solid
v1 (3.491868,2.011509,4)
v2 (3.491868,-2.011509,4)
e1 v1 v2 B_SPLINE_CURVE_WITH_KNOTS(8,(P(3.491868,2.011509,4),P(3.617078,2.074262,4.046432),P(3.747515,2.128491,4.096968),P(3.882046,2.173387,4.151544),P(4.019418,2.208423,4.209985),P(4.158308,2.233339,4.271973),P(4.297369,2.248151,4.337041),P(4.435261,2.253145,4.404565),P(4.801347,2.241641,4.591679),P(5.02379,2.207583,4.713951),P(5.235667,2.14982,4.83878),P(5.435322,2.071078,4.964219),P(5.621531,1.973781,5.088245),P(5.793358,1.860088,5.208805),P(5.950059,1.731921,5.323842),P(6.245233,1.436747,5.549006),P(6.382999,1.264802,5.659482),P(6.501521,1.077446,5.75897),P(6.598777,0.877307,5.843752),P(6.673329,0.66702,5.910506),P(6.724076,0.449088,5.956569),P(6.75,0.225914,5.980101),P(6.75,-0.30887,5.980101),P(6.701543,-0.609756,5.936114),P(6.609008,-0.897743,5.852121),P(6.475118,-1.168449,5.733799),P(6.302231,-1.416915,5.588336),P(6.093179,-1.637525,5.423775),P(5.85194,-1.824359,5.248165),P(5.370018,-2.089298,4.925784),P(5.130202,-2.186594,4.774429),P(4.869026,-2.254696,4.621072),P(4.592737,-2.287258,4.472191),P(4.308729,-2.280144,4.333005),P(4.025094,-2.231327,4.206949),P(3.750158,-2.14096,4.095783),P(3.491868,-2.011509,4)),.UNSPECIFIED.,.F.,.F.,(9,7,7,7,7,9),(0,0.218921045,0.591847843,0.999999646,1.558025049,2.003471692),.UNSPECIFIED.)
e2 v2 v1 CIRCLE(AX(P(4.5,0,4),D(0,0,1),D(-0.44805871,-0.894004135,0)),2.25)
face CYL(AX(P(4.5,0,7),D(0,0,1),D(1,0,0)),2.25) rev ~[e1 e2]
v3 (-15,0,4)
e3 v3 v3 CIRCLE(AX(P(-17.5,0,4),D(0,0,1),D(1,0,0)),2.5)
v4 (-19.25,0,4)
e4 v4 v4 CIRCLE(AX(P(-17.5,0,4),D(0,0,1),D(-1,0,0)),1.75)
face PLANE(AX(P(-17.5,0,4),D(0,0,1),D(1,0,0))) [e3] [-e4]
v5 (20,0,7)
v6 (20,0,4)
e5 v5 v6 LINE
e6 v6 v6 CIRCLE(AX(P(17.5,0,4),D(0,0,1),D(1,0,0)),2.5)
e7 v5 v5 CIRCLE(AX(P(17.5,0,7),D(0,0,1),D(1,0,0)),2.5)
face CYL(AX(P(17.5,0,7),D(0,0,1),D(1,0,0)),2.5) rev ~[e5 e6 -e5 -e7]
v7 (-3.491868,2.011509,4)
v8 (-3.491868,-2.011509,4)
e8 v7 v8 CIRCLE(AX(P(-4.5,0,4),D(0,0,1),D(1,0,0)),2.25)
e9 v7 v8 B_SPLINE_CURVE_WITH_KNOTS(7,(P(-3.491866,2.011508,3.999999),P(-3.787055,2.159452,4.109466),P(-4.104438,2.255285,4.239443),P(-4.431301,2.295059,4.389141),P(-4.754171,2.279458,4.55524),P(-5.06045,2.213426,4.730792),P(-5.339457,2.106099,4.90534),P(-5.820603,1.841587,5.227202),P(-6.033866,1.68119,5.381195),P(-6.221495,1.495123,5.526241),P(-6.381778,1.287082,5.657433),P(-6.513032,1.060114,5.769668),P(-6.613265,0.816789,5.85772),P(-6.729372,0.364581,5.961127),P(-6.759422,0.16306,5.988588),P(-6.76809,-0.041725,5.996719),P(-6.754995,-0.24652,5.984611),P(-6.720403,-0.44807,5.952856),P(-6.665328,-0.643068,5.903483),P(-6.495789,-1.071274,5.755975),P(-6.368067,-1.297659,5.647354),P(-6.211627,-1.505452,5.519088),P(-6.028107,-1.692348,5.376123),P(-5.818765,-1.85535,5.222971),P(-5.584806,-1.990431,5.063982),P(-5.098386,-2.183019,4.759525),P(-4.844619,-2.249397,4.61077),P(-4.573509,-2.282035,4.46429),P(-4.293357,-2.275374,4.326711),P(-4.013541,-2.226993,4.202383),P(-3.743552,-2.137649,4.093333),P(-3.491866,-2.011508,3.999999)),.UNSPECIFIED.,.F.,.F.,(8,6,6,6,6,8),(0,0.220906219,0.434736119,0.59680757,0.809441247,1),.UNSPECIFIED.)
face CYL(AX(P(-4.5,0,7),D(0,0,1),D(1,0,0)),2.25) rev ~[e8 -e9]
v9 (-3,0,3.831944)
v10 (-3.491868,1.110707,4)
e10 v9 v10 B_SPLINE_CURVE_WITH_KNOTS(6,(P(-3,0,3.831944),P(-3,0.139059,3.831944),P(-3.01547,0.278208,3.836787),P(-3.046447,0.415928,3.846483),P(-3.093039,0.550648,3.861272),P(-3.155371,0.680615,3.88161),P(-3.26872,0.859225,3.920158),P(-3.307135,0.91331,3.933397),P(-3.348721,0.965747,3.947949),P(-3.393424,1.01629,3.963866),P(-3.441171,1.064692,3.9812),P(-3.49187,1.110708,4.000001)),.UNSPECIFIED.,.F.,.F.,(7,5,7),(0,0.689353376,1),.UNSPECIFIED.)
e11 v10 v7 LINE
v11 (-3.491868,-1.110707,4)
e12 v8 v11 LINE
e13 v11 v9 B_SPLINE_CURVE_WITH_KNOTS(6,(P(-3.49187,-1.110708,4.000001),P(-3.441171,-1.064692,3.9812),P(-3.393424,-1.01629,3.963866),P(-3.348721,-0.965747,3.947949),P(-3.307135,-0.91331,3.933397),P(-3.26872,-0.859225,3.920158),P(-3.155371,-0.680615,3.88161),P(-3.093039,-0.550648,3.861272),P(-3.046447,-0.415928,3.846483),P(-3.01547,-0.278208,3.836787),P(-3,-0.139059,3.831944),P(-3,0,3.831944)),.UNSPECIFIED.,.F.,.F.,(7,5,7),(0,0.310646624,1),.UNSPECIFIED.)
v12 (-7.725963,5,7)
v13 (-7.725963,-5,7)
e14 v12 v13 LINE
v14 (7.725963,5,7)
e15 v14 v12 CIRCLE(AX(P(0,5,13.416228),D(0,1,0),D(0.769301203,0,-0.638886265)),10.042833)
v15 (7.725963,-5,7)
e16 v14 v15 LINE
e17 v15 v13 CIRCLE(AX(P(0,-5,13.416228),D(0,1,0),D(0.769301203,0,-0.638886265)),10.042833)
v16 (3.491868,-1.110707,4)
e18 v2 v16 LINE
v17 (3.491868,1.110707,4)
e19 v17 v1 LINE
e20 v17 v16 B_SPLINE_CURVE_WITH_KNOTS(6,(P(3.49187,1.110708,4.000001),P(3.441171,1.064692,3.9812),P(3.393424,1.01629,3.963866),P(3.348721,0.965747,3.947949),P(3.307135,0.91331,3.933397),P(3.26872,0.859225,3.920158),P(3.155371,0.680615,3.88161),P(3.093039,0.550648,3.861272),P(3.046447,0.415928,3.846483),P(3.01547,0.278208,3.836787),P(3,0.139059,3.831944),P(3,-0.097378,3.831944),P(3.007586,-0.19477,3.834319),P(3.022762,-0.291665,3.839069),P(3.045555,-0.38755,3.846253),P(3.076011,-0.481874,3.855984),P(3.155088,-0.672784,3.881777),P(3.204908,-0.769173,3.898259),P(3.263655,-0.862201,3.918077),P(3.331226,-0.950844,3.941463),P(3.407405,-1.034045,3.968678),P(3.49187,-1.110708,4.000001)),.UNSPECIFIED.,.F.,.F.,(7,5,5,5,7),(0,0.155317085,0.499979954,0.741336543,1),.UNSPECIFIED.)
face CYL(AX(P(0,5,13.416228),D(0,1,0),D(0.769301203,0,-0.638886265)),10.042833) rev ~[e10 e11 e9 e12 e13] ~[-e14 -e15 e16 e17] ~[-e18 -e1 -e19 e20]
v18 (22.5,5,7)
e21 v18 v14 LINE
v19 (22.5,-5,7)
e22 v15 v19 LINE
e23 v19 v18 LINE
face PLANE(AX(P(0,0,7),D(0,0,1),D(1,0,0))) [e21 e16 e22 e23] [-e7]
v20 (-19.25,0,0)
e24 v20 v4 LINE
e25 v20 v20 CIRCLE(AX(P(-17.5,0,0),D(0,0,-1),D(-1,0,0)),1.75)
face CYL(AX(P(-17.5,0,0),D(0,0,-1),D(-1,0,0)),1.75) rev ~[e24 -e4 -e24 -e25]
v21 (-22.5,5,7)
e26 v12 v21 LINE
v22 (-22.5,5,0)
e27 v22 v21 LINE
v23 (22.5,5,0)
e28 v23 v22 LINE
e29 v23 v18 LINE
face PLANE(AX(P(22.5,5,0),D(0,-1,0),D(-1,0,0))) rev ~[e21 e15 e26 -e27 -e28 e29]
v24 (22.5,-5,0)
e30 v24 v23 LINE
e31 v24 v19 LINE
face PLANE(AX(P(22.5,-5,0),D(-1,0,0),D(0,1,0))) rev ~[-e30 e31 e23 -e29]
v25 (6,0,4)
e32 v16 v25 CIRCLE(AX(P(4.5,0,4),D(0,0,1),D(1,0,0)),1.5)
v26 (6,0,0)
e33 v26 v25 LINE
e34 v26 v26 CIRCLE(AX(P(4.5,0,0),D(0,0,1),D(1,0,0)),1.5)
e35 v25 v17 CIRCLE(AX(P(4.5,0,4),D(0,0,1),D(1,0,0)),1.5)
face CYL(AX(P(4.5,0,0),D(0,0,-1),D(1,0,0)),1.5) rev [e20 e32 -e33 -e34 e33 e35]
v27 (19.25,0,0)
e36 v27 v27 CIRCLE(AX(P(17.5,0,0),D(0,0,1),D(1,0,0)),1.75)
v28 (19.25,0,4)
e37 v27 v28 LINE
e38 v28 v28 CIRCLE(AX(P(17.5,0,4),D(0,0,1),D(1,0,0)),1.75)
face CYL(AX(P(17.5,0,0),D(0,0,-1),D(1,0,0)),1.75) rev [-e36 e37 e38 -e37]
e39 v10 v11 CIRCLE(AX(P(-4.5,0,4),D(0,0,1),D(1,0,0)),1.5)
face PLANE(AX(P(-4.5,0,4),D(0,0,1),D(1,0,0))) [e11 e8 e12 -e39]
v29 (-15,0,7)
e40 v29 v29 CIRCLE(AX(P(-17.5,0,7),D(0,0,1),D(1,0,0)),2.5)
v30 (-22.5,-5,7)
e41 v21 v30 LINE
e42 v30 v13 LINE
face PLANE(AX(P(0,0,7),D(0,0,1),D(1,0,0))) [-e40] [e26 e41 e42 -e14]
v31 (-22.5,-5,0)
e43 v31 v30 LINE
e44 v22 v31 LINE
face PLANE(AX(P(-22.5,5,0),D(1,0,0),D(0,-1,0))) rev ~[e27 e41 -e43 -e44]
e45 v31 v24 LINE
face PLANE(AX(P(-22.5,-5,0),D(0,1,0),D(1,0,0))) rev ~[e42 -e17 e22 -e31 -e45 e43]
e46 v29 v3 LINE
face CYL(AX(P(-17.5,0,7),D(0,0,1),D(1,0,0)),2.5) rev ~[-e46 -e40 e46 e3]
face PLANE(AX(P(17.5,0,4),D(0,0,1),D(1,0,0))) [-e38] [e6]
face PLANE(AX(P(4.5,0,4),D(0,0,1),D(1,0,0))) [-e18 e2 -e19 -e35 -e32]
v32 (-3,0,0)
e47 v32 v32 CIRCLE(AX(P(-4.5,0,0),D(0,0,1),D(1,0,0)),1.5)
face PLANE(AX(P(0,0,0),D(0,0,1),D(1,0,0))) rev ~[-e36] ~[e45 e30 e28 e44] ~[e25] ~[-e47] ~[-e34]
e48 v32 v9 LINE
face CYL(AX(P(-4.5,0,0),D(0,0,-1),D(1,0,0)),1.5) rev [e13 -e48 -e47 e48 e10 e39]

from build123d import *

# Parameters (mm, degrees)
F0_R     = 1.5
F0_R_2   = 1.75
F1_DEPTH = 7
F2_R     = 2.5
F2_R_2   = 1.75
F2_R_3   = 2.25
F2_R_4   = 1.5
F3_DEPTH = 3
F5_DEPTH = 25


with BuildPart() as f1:
    # F0 (on Top) → F1 (new body)
    with BuildSketch(Plane.XY):
        Polygon((22.5, 0), (22.5, 5), (-22.5, 5), (-22.5, 0), (-22.5, -5), (22.5, -5), align=None)
        with BuildLine():
            ThreePointArc((-15.75, 0), (-17.5, -1.75), (-19.25, 0))
            ThreePointArc((-19.25, 0), (-17.5, 1.75), (-15.75, 0))
        make_face(mode=Mode.SUBTRACT)
        with Locations((-4.5, 0)):
            Circle(F0_R, mode=Mode.SUBTRACT)
        with Locations((4.5, 0)):
            Circle(F0_R, mode=Mode.SUBTRACT)
        with Locations((17.5, 0)):
            Circle(F0_R_2, mode=Mode.SUBTRACT)
    extrude(amount=F1_DEPTH)

    # F2 (on face) → F3 (cut)
    with BuildSketch(Plane.XY.offset(7)):
        with Locations((-17.5, 0)):
            Circle(F2_R)
        with Locations((-17.5, 0)):
            Circle(F2_R_2, mode=Mode.SUBTRACT)
        with Locations((-4.5, 0)):
            Circle(F2_R_3)
        with Locations((-4.5, 0)):
            Circle(F2_R_4, mode=Mode.SUBTRACT)
        with Locations((4.5, 0)):
            Circle(F2_R_3)
        with Locations((4.5, 0)):
            Circle(F2_R_4, mode=Mode.SUBTRACT)
        with Locations((17.5, 0)):
            Circle(F2_R)
        with Locations((17.5, 0)):
            Circle(F2_R_2, mode=Mode.SUBTRACT)
    extrude(amount=-F3_DEPTH, mode=Mode.SUBTRACT)

    # F4 (on face) → F5 (cut)
    with BuildSketch(Plane(origin=(0, 5, 0), x_dir=(-1, 0, 0), z_dir=(0, 1, 0))):
        with BuildLine():
            Line((0, 7), (-7.72596329, 7))
            ThreePointArc((-7.72596329, 7), (0, 3.3733951654), (7.72596329, 7))
            Line((7.72596329, 7), (0, 7))
        make_face()
    extrude(amount=-F5_DEPTH, mode=Mode.SUBTRACT)


solid = f1.part
